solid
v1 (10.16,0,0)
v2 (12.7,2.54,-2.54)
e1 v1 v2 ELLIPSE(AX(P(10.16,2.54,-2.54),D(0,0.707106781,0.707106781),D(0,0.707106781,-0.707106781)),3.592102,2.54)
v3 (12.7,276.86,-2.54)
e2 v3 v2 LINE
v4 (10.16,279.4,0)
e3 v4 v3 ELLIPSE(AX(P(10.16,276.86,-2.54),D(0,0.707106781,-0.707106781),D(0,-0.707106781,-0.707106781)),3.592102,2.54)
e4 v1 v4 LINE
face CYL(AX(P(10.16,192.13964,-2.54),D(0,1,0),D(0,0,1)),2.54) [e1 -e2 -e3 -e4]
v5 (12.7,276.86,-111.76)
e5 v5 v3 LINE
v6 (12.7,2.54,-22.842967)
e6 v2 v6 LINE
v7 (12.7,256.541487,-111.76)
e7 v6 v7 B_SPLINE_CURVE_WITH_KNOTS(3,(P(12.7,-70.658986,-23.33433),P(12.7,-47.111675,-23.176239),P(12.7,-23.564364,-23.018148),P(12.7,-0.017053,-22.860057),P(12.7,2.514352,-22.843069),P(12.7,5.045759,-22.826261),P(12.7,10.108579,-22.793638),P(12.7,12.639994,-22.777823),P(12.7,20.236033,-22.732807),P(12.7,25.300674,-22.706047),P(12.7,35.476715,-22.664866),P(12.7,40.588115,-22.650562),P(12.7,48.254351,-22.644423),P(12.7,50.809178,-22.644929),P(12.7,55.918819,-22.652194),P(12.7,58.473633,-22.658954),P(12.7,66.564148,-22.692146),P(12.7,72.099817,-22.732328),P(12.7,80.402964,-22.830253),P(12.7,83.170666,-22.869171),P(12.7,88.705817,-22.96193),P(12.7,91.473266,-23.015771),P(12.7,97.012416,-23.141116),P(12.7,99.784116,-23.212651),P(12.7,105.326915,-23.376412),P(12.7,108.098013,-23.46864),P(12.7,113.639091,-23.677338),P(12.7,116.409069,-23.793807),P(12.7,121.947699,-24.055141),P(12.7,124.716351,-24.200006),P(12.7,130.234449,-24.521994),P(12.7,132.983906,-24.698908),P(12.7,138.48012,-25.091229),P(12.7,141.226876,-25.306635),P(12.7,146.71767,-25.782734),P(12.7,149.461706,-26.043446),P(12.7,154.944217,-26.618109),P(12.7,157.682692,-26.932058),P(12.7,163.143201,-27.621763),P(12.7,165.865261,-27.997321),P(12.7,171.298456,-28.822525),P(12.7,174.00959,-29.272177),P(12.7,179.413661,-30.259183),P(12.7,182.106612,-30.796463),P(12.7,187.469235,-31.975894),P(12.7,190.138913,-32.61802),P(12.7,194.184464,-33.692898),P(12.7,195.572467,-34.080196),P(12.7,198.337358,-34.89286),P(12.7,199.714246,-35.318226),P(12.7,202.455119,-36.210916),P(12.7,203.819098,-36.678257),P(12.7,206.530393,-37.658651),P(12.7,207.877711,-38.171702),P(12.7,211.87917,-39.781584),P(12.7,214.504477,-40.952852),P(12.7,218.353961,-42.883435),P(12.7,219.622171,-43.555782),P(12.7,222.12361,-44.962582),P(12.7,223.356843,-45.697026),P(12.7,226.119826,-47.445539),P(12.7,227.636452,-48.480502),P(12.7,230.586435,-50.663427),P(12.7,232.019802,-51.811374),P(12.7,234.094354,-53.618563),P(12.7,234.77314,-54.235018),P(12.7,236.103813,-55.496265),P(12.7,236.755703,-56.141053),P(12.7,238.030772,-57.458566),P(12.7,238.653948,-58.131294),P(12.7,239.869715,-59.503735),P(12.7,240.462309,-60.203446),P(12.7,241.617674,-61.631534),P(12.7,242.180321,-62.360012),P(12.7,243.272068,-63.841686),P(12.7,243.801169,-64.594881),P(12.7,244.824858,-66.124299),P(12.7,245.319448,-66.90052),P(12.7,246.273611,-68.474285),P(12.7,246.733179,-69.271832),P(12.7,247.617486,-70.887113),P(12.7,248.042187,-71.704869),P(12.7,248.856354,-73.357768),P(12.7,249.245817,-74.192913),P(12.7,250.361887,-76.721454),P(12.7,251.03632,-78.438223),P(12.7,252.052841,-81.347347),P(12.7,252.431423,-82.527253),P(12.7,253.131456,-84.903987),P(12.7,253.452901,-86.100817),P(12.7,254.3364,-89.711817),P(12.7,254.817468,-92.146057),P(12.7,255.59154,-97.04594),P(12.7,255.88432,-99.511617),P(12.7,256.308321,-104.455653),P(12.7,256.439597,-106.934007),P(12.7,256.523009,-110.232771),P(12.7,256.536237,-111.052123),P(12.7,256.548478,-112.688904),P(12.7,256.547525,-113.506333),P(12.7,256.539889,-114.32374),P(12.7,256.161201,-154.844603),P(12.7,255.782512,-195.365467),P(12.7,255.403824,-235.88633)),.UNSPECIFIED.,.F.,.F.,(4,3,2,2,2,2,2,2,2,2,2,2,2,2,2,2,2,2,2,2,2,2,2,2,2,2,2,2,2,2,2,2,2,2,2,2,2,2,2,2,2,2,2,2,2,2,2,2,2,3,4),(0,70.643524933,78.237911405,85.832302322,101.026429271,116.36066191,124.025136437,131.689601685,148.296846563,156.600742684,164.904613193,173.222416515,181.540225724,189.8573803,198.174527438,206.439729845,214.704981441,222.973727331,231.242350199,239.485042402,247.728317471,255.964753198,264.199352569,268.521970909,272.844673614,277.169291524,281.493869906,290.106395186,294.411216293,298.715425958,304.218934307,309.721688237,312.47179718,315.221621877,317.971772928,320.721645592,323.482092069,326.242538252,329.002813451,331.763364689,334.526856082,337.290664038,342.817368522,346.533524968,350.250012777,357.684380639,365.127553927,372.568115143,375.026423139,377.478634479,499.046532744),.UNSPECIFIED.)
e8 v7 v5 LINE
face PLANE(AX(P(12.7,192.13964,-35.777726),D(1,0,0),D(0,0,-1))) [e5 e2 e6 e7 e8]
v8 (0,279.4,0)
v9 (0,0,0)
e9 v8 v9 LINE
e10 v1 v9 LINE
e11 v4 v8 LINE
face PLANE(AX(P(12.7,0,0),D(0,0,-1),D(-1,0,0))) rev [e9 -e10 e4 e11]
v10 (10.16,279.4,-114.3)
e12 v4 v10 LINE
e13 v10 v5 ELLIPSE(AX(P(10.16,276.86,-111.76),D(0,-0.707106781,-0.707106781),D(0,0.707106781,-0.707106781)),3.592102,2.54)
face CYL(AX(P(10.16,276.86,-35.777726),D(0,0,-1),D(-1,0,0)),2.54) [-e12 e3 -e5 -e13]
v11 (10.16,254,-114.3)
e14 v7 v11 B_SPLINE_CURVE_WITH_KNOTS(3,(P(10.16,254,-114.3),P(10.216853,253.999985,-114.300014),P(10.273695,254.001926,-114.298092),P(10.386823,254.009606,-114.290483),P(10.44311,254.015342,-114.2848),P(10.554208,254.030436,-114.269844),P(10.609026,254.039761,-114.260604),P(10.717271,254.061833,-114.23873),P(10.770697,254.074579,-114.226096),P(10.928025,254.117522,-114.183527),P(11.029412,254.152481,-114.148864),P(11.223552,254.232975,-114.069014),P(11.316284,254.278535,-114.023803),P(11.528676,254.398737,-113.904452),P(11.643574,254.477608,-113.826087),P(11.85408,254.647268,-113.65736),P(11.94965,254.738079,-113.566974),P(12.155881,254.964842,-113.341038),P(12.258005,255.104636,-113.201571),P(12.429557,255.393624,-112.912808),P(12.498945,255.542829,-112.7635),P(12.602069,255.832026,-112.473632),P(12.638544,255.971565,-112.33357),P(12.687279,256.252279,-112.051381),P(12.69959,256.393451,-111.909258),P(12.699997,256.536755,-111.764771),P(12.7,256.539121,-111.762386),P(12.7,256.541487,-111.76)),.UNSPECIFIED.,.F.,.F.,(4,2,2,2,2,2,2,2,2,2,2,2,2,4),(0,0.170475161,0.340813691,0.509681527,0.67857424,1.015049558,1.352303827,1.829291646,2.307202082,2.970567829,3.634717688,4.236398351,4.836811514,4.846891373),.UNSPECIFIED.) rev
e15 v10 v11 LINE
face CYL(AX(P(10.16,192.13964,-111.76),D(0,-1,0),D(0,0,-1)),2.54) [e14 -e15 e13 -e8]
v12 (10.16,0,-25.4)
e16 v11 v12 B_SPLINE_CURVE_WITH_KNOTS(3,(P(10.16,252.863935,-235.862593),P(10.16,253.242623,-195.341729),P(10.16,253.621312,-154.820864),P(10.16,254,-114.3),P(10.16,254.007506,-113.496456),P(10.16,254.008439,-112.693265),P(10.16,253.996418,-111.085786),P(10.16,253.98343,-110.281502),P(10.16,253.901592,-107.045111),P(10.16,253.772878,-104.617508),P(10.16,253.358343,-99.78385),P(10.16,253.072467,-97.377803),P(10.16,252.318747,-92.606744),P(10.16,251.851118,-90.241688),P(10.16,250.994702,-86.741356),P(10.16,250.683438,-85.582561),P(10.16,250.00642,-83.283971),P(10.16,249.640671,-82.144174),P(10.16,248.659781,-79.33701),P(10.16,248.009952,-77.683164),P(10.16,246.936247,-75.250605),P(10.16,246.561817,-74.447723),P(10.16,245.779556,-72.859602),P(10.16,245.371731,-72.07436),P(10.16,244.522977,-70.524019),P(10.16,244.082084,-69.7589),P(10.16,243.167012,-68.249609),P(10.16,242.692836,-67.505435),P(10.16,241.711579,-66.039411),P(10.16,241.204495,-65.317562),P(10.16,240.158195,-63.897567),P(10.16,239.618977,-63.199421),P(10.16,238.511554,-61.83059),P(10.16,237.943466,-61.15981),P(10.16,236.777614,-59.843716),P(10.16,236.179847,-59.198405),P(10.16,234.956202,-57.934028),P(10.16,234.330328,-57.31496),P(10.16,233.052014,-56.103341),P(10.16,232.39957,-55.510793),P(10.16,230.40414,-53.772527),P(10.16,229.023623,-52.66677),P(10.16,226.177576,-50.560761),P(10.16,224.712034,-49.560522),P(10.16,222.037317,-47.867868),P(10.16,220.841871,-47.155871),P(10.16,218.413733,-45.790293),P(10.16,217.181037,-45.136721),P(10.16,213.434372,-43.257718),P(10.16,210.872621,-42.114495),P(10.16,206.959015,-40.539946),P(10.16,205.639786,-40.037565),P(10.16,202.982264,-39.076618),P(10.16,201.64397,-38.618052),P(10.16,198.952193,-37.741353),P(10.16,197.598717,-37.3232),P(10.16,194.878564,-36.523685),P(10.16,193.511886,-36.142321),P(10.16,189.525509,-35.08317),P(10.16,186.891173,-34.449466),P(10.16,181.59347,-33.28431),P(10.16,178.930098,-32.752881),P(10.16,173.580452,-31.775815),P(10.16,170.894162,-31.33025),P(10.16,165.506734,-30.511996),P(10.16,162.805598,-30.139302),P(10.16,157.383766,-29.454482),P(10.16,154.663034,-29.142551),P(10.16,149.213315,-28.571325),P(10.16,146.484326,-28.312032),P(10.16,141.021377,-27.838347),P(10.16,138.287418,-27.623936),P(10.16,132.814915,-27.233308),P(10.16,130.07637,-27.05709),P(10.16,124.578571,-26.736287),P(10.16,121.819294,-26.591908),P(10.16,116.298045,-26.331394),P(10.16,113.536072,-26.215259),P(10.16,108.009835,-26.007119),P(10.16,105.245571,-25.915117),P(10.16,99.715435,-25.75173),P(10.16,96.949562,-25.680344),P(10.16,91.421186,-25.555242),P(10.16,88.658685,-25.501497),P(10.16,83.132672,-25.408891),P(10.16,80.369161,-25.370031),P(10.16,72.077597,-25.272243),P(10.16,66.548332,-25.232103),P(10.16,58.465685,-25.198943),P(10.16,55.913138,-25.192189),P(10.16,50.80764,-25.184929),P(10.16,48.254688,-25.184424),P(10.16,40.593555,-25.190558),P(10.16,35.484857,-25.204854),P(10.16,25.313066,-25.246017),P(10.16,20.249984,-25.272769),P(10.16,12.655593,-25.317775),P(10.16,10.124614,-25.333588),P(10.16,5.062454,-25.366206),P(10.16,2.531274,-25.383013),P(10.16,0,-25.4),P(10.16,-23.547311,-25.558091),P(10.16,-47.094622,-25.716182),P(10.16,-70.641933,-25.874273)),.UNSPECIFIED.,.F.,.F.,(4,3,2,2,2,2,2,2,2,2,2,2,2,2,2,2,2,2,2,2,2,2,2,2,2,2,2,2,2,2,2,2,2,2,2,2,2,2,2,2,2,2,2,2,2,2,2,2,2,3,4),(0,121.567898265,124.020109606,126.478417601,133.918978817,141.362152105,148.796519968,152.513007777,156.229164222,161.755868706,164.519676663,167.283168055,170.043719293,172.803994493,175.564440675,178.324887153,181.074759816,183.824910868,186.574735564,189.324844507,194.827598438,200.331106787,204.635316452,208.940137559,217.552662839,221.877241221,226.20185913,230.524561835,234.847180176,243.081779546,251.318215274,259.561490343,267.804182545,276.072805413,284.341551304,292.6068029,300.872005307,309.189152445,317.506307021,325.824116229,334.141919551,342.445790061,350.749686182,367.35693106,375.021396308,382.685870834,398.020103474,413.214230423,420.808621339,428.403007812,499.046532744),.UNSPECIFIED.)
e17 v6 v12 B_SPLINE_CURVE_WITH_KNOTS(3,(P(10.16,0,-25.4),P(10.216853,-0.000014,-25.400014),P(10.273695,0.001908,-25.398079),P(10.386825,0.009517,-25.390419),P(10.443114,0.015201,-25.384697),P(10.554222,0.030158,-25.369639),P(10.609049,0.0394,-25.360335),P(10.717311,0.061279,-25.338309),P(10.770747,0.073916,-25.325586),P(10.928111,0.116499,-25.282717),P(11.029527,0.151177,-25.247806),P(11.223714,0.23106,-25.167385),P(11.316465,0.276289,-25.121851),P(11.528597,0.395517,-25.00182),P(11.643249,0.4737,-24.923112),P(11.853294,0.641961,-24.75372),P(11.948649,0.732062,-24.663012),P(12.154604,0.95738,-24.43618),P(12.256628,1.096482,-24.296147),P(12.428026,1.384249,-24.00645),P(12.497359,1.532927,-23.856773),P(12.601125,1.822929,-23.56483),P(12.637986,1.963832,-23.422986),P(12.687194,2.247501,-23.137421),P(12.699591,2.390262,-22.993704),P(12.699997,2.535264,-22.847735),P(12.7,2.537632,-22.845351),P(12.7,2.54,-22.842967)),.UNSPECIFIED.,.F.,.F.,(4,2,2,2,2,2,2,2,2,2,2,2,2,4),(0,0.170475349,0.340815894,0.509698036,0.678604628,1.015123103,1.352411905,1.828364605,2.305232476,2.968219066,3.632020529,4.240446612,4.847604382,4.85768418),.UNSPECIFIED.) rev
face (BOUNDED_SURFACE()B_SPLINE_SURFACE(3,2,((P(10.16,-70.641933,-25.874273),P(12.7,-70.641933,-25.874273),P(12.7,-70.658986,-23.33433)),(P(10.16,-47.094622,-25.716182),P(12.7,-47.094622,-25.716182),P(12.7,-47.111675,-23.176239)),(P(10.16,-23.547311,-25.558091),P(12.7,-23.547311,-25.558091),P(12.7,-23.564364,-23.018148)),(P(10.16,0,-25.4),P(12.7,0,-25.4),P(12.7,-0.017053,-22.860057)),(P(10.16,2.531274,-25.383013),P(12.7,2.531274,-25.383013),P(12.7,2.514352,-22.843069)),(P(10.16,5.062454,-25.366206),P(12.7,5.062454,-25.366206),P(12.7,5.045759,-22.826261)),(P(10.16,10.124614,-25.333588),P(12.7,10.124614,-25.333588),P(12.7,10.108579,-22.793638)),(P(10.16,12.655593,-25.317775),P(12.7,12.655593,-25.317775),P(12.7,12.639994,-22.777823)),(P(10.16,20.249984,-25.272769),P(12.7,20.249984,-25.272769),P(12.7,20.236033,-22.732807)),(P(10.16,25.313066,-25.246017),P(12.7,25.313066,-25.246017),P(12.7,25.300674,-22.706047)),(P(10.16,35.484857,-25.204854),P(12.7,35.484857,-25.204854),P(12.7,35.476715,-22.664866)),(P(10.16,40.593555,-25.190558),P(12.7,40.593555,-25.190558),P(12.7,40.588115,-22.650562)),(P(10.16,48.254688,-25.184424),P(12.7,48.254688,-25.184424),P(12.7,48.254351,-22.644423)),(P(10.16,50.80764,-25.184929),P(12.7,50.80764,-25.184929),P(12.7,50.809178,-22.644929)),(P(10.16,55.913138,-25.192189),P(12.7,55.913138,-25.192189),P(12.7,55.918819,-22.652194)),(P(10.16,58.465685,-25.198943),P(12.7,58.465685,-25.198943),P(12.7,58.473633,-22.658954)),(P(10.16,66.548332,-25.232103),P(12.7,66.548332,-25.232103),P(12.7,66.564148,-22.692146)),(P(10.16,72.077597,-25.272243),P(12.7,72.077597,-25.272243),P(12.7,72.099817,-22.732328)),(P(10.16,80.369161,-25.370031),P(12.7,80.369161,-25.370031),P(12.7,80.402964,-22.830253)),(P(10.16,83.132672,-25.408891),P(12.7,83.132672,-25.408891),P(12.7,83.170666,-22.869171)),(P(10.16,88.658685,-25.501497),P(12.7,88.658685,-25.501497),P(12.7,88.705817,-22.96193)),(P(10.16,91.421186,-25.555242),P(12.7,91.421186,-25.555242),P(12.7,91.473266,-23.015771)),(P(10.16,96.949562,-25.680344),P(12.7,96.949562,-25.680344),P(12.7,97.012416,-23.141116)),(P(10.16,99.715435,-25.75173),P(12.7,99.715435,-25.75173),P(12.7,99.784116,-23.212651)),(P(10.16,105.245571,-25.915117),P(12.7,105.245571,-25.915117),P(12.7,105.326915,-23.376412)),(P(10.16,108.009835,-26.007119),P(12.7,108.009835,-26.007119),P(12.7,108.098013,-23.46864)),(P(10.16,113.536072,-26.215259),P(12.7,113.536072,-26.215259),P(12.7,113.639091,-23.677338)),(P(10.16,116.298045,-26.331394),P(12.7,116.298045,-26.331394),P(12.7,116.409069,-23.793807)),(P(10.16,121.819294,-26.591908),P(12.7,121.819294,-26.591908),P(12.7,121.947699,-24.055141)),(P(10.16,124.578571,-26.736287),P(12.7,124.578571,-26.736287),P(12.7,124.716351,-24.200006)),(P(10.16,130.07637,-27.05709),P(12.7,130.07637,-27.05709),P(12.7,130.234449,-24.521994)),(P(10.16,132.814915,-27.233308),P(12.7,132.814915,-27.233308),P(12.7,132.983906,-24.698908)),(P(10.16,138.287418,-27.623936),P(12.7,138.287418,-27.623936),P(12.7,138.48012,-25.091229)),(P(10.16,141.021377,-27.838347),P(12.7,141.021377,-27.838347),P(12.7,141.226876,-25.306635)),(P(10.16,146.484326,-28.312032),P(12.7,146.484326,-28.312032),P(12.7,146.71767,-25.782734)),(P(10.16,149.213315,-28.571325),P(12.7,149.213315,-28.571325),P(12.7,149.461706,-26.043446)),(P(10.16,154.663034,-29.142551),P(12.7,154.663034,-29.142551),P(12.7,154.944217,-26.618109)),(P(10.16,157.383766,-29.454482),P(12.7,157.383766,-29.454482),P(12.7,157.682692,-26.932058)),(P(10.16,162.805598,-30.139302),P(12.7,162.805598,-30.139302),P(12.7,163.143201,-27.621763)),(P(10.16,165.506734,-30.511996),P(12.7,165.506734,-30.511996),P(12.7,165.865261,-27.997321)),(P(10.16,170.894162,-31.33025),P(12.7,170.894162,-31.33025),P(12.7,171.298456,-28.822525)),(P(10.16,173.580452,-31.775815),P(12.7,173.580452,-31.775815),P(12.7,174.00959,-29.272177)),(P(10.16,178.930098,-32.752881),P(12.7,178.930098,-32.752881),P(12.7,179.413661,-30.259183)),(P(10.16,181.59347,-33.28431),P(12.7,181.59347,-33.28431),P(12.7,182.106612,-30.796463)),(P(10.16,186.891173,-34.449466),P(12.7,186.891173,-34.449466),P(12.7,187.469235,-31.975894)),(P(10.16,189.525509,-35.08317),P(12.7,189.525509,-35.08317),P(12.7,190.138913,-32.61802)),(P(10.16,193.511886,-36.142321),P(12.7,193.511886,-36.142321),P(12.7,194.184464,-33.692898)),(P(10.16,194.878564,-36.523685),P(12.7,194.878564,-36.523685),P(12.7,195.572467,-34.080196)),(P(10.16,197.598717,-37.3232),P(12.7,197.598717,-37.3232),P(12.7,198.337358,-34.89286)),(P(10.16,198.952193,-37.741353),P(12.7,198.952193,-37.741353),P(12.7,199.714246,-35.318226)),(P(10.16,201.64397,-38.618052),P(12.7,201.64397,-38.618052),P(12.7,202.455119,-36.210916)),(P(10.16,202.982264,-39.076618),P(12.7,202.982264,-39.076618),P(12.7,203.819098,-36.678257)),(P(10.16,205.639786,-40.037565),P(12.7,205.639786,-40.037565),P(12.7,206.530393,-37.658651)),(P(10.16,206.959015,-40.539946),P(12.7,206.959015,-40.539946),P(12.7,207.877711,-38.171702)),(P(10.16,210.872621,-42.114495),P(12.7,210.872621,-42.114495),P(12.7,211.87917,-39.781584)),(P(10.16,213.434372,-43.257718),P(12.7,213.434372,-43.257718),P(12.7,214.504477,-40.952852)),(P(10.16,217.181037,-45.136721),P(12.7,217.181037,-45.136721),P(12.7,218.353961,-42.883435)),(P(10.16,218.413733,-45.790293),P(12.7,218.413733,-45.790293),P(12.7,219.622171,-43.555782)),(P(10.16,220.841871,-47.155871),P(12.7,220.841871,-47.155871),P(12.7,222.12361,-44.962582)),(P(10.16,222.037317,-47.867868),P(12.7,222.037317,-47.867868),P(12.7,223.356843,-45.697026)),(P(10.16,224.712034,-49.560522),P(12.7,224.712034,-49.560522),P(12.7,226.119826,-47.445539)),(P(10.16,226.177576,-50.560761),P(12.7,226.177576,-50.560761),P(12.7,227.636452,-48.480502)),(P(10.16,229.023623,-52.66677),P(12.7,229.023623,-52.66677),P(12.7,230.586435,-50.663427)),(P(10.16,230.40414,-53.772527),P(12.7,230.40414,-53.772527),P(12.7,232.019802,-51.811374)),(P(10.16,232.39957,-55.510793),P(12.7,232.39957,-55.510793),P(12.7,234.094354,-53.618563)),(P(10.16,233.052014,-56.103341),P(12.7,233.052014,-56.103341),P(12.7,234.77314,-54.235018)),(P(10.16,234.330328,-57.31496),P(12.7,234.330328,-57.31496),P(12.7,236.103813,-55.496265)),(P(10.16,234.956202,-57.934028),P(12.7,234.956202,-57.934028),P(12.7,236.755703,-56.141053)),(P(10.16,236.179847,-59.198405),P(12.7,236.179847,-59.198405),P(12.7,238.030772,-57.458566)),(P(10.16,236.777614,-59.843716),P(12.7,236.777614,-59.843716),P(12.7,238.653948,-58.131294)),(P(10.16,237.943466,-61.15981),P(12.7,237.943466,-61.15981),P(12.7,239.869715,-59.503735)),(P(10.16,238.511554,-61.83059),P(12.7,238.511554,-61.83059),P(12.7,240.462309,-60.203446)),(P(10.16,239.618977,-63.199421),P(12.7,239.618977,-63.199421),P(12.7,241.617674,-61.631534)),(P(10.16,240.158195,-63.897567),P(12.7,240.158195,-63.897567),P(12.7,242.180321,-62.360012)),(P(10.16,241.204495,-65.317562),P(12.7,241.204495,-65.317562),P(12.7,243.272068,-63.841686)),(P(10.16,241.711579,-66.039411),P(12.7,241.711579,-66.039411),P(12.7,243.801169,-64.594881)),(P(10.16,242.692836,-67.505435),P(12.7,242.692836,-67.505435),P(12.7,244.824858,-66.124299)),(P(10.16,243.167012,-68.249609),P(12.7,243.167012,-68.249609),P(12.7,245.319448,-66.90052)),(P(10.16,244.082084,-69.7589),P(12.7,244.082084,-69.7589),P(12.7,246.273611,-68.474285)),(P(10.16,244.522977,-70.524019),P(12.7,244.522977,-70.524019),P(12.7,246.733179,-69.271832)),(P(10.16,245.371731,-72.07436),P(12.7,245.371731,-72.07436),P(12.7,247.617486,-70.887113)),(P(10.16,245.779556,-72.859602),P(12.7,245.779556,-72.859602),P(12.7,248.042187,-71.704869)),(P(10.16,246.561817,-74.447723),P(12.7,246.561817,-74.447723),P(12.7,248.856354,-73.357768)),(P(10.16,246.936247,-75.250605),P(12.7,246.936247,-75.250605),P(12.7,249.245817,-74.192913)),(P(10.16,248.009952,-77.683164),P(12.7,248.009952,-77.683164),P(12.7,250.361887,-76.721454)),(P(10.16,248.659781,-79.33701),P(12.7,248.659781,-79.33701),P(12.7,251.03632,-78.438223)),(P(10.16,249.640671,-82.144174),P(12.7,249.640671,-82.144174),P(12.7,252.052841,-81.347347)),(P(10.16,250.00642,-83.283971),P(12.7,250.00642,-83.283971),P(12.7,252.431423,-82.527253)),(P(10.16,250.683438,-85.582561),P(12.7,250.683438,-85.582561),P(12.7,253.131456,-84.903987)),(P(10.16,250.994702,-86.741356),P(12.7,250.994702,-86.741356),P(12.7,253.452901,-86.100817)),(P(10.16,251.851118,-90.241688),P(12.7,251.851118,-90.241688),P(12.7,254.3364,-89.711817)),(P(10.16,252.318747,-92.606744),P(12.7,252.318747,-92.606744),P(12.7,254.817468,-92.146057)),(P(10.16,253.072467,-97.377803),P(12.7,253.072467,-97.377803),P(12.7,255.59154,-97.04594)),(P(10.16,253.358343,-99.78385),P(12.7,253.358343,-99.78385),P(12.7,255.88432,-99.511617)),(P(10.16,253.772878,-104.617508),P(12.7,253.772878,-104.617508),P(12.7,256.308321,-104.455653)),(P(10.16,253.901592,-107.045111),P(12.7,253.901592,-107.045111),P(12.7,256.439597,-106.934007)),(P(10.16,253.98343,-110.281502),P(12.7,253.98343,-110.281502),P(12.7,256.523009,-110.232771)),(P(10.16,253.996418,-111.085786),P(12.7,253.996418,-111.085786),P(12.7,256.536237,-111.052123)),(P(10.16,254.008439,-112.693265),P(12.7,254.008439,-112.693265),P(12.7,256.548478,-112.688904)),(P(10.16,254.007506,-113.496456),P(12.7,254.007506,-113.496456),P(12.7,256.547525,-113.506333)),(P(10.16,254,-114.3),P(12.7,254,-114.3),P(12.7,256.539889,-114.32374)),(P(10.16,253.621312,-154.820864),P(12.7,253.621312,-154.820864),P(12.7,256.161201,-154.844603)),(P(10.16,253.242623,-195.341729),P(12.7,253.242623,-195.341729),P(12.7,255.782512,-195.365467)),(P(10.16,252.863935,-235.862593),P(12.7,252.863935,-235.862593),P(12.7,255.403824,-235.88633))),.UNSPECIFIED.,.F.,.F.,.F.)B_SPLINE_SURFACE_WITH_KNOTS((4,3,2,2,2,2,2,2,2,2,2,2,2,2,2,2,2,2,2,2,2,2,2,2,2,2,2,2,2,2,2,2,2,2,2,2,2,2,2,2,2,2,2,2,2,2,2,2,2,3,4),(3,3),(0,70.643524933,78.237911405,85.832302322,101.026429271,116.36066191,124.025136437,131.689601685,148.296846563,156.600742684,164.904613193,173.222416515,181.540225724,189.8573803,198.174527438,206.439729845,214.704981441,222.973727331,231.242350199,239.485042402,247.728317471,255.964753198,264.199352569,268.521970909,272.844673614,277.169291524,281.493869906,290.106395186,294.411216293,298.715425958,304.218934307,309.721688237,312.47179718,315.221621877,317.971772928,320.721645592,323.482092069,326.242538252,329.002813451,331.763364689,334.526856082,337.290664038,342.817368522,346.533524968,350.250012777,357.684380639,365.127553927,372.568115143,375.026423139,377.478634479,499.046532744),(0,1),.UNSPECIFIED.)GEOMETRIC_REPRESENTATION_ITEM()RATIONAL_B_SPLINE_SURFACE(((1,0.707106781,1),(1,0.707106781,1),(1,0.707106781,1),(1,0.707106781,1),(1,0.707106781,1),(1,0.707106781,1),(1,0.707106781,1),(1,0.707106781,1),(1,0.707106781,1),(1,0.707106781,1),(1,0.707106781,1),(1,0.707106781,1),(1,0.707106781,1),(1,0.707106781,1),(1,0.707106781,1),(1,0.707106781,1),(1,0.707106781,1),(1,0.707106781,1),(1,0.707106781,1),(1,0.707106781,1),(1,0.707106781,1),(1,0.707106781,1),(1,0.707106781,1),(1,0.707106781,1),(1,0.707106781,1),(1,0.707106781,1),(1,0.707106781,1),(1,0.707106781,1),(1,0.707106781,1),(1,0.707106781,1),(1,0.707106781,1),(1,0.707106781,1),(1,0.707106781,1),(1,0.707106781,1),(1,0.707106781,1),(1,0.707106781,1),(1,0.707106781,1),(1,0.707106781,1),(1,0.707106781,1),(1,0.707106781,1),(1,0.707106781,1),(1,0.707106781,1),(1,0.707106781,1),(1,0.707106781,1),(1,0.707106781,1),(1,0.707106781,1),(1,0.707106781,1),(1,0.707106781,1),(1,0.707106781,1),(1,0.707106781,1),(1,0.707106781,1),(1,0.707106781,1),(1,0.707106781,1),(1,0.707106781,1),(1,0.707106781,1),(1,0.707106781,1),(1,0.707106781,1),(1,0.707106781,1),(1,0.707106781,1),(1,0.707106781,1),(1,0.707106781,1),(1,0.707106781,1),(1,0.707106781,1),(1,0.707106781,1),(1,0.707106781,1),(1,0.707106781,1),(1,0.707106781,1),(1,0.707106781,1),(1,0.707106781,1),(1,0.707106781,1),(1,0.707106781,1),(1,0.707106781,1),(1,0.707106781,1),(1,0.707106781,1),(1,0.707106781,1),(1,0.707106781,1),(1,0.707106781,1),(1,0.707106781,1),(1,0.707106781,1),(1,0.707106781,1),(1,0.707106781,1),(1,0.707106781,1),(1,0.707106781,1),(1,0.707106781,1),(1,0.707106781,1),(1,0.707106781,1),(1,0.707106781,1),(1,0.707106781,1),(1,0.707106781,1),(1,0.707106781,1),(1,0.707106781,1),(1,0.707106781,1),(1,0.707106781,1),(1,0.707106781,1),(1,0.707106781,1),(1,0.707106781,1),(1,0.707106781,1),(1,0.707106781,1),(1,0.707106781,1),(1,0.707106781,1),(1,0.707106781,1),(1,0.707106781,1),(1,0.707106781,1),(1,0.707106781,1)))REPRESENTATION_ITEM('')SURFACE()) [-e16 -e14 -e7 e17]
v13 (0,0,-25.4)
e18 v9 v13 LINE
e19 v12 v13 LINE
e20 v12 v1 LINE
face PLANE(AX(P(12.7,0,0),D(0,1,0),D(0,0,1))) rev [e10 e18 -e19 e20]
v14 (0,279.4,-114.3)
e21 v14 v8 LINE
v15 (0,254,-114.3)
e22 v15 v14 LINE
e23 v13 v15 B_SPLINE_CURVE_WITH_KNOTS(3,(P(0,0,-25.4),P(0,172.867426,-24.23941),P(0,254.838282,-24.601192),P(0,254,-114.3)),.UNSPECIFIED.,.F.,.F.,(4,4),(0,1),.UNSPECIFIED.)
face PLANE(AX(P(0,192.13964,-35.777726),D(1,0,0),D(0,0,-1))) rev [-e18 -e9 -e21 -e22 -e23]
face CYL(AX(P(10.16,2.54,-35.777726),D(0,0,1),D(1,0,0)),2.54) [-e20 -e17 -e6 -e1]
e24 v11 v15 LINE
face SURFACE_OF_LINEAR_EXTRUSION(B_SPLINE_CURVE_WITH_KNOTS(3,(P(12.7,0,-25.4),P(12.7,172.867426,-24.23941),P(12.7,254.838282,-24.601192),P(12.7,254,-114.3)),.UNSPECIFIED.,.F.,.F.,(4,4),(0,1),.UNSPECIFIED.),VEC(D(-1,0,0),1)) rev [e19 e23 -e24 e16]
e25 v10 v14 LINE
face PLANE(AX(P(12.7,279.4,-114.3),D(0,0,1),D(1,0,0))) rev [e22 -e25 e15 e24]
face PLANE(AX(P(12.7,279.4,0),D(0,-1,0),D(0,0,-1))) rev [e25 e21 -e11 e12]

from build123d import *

# Parameters (mm, degrees)
BOSS_EXTRUDE1_DEPTH = 12.7
FILLET1_R           = 2.54


with BuildPart() as part:
    # Sketch1 → Boss-Extrude1 (new body)
    with BuildSketch(Plane(origin=(0, 0, 0), x_dir=(0, 0, -1), z_dir=(1, 0, 0))):
        with BuildLine():
            Line((0, 0), (0, 279.4))
            Line((0, 279.4), (114.3, 279.4))
            Line((114.3, 279.4), (114.3, 254))
            add(Edge.make_bspline(
                [(25.4, 0), (24.239409863, 172.867425699), (24.601191912, 254.838281825), (114.3, 254)],
                knots=[0, 0, 0, 0, 1, 1, 1, 1], degree=3))
            Line((25.4, 0), (0, 0))
        make_face()
    extrude(amount=BOSS_EXTRUDE1_DEPTH)

    # Fillet1
    fillet1_edges = [part.edges().sort_by_distance(p)[0] for p in [
        (12.7, 266.7, -114.3),
        (12.7, 279.4, -57.15),
        (12.7, 139.7, 0),
        (12.7, 0, -12.7),
        (12.7, 192.139640321, -35.777725666),
    ]]
    fillet(fillet1_edges, radius=FILLET1_R - 0.0001)  # a hair under: the kernel refuses the full size


solid = part.part
